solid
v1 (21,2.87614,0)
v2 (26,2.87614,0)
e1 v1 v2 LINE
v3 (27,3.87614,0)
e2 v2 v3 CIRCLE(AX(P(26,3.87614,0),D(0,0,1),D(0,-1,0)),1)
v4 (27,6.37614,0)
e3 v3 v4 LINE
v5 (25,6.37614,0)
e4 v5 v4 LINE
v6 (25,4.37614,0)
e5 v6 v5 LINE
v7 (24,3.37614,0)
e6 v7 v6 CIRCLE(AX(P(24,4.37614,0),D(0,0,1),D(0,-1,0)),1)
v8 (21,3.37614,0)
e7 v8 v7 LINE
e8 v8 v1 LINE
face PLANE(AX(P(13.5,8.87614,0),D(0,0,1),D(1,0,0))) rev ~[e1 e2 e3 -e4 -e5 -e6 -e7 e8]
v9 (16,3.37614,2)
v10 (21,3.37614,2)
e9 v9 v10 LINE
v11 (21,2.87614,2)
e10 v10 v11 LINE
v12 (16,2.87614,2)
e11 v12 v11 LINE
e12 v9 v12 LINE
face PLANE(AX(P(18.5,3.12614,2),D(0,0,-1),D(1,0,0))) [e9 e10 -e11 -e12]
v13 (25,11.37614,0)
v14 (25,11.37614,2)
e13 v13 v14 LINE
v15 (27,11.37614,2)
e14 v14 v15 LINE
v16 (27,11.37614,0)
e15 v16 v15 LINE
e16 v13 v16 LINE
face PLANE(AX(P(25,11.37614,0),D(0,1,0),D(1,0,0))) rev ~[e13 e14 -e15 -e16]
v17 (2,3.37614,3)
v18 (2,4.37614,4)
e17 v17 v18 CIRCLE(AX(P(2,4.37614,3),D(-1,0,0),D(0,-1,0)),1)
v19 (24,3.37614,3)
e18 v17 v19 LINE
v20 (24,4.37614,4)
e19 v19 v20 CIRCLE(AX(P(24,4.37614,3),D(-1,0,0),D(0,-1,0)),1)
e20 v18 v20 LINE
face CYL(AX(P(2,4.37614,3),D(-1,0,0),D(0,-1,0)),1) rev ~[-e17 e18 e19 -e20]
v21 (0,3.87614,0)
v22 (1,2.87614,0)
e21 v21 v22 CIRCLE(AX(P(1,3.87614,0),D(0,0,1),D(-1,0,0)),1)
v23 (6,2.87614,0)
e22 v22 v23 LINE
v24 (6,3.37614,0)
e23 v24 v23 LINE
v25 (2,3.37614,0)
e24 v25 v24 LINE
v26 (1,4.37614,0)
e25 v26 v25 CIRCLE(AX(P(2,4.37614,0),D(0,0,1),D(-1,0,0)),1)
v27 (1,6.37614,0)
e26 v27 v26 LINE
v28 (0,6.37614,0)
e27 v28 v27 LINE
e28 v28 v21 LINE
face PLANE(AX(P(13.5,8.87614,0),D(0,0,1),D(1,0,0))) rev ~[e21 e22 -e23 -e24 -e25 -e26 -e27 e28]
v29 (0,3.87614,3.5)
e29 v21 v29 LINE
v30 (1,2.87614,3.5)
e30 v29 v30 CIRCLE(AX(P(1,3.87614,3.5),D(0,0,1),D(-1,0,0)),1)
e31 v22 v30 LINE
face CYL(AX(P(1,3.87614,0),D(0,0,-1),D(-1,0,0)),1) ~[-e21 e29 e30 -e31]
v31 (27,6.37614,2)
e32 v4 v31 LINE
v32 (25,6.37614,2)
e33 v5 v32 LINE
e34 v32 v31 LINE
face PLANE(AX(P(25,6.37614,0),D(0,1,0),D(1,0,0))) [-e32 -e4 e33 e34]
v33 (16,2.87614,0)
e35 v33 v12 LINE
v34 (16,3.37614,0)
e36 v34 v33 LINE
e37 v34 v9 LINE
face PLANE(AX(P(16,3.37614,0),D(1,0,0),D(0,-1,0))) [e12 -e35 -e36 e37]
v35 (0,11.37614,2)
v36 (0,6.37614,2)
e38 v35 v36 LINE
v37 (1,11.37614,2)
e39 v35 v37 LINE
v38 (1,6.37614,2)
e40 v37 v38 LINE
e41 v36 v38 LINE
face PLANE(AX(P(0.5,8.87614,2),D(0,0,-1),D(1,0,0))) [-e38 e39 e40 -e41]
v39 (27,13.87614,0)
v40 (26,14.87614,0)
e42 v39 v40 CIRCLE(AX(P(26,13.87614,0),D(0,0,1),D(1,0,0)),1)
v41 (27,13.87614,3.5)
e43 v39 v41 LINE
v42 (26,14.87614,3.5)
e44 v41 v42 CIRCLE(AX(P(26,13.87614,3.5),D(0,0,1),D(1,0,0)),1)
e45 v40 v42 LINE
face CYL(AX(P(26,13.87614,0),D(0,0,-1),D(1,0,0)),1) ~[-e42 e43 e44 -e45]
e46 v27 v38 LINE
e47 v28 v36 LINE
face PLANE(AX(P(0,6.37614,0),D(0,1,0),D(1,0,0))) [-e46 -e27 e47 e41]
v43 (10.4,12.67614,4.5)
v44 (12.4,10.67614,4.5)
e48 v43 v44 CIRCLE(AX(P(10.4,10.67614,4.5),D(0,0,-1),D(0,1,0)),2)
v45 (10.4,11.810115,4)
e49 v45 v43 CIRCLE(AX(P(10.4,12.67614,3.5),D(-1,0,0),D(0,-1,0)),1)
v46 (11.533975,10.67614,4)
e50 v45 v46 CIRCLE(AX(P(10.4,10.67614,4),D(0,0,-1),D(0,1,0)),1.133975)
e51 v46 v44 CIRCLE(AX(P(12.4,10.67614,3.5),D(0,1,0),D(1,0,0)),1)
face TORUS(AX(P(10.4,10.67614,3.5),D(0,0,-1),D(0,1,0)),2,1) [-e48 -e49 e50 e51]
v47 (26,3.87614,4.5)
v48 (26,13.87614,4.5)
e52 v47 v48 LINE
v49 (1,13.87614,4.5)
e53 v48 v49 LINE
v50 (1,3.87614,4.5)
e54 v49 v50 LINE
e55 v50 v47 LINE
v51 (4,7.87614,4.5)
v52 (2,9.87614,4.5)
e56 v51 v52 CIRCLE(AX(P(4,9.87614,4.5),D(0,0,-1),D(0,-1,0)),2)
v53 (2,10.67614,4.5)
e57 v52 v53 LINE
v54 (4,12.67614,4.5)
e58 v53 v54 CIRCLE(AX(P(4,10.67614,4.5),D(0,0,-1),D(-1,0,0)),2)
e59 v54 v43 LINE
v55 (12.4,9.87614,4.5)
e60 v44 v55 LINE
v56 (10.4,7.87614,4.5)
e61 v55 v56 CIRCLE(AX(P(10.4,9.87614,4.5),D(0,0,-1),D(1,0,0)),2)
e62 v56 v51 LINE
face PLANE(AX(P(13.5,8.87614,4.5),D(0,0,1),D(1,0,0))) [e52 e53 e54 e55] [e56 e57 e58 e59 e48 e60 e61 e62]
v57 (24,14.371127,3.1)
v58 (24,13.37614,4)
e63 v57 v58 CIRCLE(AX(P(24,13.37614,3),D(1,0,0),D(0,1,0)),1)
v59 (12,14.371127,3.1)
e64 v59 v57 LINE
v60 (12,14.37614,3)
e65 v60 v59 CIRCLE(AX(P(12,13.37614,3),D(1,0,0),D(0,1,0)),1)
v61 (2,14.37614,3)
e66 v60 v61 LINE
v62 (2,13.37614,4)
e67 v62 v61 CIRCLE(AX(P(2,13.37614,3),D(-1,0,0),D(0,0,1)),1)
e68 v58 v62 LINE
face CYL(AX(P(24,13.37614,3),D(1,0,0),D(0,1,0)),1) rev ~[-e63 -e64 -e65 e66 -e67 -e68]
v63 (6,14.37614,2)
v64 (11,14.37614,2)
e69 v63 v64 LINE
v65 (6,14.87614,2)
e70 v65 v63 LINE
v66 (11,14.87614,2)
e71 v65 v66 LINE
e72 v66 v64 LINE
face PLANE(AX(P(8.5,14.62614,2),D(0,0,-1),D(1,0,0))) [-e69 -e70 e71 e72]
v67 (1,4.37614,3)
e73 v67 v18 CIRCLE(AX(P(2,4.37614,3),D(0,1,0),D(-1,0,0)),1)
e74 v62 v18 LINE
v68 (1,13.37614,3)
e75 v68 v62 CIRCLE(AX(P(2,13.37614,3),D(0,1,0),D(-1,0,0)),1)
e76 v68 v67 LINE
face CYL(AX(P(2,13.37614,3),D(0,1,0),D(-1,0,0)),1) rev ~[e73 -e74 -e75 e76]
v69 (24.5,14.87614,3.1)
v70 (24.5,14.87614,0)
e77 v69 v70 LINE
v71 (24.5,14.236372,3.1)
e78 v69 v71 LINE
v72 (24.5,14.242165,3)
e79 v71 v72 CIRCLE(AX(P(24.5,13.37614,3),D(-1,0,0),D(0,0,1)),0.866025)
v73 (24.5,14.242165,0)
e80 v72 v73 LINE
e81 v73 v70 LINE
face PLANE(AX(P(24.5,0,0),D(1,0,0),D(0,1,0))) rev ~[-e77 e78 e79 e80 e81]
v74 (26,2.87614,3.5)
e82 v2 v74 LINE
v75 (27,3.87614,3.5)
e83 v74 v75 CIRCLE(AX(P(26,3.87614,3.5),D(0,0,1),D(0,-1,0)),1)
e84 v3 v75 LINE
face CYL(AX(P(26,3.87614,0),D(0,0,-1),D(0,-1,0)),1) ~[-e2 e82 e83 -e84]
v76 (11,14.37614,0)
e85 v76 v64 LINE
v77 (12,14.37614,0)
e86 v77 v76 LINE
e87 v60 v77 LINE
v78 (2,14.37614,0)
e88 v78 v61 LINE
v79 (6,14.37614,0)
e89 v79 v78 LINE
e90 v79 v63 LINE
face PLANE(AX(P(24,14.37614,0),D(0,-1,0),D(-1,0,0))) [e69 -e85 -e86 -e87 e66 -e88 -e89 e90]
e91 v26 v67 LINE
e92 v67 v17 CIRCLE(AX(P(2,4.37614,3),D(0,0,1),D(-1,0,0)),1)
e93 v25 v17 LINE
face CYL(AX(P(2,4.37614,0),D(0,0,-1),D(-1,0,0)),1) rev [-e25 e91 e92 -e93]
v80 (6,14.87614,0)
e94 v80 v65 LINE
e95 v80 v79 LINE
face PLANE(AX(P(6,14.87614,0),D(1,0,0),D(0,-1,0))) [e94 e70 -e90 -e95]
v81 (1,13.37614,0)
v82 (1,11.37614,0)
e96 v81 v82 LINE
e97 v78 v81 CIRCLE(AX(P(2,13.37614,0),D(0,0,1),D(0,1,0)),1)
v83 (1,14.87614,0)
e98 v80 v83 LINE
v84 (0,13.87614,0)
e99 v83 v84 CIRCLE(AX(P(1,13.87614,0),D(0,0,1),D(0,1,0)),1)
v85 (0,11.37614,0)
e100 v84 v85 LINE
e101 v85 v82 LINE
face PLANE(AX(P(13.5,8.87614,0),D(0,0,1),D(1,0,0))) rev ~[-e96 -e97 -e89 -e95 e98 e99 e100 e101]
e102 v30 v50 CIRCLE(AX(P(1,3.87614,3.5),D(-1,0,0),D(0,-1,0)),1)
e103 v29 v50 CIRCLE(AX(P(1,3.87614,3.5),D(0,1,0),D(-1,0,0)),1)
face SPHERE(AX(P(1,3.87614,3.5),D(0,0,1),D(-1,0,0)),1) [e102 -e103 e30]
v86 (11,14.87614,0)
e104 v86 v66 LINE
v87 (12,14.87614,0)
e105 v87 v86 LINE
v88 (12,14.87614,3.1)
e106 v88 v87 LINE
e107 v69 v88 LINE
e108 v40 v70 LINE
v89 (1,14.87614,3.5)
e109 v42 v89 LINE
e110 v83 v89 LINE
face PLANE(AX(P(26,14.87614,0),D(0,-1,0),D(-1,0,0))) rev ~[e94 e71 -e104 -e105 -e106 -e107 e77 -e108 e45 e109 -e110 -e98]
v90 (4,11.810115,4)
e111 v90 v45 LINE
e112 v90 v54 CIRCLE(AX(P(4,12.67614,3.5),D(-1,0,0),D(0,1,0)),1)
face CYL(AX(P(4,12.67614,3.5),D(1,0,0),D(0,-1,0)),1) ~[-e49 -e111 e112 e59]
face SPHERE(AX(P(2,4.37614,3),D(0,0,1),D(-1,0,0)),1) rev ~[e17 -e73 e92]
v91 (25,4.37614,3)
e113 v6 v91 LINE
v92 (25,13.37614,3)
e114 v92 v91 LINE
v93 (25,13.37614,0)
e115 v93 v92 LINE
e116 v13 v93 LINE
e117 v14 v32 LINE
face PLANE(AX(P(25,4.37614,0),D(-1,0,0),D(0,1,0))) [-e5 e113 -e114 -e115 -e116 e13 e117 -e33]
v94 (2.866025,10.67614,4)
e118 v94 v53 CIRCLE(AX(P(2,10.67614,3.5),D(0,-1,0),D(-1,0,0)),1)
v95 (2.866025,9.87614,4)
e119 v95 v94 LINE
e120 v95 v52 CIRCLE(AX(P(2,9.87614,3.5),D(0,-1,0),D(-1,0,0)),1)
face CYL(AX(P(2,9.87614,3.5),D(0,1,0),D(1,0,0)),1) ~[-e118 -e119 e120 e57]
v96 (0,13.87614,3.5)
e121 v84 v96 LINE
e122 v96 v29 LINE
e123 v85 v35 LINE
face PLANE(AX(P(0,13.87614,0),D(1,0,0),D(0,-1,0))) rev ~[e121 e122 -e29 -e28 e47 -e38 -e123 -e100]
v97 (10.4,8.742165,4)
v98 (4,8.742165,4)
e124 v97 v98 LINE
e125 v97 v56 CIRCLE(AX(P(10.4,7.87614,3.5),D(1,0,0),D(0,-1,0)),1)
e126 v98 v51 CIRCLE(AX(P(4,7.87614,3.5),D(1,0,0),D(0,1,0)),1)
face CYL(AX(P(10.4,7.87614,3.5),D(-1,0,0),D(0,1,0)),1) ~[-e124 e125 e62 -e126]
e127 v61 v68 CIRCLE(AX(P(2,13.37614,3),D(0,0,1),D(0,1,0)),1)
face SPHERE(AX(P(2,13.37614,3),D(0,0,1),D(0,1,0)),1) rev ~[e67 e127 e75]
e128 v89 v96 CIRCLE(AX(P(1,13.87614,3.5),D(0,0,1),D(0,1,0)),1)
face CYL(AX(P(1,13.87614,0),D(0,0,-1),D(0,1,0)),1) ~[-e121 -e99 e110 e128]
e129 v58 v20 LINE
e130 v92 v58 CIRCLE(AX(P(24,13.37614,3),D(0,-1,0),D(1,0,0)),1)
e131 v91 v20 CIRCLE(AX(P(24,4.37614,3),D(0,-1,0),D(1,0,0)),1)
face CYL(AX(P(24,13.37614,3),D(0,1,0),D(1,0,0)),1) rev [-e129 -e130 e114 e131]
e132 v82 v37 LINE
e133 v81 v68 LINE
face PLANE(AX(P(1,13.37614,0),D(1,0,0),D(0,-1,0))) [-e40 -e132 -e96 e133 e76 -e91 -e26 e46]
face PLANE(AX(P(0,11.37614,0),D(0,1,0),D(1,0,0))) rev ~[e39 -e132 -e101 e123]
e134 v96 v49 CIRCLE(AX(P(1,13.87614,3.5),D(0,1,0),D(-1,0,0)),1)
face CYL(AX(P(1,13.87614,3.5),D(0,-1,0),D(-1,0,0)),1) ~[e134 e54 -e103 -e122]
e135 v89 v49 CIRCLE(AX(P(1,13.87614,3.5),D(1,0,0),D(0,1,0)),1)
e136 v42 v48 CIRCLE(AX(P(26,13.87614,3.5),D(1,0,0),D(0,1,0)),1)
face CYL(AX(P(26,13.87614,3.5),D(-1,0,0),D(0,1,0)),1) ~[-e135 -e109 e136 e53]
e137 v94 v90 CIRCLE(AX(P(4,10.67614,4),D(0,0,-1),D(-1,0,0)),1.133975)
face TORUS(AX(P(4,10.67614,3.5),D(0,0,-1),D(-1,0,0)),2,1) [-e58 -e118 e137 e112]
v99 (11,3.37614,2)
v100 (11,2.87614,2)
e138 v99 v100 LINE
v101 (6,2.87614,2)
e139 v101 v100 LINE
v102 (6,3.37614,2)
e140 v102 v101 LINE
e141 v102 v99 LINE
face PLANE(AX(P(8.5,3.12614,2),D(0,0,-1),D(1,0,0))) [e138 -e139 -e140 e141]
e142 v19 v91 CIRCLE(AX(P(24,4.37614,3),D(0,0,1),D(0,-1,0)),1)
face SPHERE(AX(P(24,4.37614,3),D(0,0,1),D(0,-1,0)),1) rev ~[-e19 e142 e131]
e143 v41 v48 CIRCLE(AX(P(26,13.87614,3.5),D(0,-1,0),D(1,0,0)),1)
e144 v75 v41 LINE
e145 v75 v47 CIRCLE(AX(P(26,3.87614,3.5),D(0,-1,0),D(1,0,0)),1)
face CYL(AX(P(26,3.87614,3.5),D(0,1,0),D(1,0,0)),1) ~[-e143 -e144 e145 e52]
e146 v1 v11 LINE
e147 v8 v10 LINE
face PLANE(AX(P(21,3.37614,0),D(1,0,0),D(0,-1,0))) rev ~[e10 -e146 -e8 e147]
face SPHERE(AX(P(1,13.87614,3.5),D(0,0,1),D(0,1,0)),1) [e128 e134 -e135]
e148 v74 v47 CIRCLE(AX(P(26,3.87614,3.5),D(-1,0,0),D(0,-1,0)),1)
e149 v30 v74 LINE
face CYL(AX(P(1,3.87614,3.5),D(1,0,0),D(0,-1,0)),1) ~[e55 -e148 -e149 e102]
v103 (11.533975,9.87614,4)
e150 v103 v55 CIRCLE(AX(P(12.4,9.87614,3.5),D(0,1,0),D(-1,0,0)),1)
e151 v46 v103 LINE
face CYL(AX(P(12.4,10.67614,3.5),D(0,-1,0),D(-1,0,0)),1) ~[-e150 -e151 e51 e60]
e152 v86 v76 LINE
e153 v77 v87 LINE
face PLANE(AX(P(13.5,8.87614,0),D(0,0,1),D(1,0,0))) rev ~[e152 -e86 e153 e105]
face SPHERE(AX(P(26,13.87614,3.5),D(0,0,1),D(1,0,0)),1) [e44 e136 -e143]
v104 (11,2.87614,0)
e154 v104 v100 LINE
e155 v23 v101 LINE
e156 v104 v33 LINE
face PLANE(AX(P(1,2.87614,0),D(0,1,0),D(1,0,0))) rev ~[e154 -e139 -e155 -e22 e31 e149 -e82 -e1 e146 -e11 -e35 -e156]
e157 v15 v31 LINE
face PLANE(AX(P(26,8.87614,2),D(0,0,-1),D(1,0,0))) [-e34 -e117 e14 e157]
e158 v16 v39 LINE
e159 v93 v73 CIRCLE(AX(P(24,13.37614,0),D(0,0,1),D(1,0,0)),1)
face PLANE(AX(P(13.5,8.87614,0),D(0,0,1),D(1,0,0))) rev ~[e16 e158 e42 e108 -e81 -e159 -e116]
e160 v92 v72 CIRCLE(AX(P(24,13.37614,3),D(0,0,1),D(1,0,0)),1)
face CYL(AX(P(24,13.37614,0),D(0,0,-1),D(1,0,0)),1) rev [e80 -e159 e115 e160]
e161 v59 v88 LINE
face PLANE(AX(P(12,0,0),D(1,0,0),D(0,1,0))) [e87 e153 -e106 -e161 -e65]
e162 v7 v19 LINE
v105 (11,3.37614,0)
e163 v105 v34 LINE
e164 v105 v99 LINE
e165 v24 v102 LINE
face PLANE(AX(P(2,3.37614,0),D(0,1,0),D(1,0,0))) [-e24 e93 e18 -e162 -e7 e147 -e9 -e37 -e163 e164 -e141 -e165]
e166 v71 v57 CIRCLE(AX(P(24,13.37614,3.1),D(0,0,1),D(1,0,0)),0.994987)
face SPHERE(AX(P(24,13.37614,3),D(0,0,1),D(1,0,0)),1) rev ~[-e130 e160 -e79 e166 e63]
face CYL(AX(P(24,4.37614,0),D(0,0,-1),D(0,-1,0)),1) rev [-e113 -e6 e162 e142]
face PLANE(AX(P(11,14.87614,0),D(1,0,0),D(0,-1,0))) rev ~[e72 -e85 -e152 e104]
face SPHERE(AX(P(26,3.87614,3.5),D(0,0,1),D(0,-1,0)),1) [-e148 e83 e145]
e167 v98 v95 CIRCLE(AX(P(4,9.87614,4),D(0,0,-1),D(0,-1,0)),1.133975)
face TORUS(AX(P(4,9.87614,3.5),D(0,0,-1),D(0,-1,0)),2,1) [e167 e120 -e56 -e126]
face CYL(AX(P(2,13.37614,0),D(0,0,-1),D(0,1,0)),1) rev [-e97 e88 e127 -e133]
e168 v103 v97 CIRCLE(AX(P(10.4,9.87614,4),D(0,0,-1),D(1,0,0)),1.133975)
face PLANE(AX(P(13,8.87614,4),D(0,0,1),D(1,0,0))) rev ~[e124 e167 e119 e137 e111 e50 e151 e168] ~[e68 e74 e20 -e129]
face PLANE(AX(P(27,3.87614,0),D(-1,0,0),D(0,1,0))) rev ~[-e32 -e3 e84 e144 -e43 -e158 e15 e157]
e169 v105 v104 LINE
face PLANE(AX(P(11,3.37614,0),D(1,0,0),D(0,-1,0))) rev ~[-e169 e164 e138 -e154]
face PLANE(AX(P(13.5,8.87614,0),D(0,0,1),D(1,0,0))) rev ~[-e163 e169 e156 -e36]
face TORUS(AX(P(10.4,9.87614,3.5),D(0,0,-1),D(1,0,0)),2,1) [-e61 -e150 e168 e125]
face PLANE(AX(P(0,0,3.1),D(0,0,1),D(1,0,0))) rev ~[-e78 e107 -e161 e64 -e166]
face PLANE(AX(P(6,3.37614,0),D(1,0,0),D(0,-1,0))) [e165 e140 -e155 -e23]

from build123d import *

# Parameters (mm, degrees)
F1_DEPTH     = 4.5
F2_R         = 1
F4_DEPTH     = 4
F5_W         = 12.5
F5_H         = 2.9783394848
F6_DEPTH     = 3.1
F7_T1_DEPTH  = 22
F7_T3_DEPTH  = 9
F7_T6_ANGLE  = 90
F7_T10_DEPTH = 22
F7_T16_DEPTH = 22
F7_T22_DEPTH = 22
F7_T26_ANGLE = 90
F7_T30_ANGLE = 90
F7_T36_ANGLE = 90
F7_T42_ANGLE = 90
F7_T46_ANGLE = 90
F8_W         = 1
F8_H         = 5
F8_W_2       = 2
F8_W_3       = 5
F8_H_2       = 0.5
F9_DEPTH     = 2


# Not quite as in the source:
# - a fillet or chamfer that OpenCascade refuses, or shapes differently, is made with other operations: its cross-section is extruded or revolved along the edge and cut away or added


with BuildPart() as f1:
    # F0 (on Top) → F1 (new body)
    with BuildSketch(Plane.XY):
        with BuildLine():
            ThreePointArc((0, 3.8761399509), (0.2928932188, 3.1690331698), (1, 2.8761399509))
            Line((1, 2.8761399509), (26, 2.8761399509))
            ThreePointArc((26, 2.8761399509), (26.7071067812, 3.1690331698), (27, 3.8761399509))
            Line((27, 3.8761399509), (27, 13.8761399509))
            ThreePointArc((27, 13.8761399509), (26.7071067812, 14.5832467321), (26, 14.8761399509))
            Line((26, 14.8761399509), (1, 14.8761399509))
            ThreePointArc((1, 14.8761399509), (0.2928932188, 14.5832467321), (0, 13.8761399509))
            Line((0, 13.8761399509), (0, 3.8761399509))
        make_face()
        with BuildLine():
            ThreePointArc((3, 10.6761399509), (3.2928932188, 11.3832467321), (4, 11.6761399509))
            Line((4, 11.6761399509), (10.4, 11.6761399509))
            ThreePointArc((10.4, 11.6761399509), (11.1071067812, 11.3832467321), (11.4, 10.6761399509))
            Line((11.4, 10.6761399509), (11.4, 9.8761399509))
            ThreePointArc((11.4, 9.8761399509), (11.1071067812, 9.1690331698), (10.4, 8.8761399509))
            Line((10.4, 8.8761399509), (4, 8.8761399509))
            ThreePointArc((4, 8.8761399509), (3.2928932188, 9.1690331698), (3, 9.8761399509))
            Line((3, 9.8761399509), (3, 10.6761399509))
        make_face(mode=Mode.SUBTRACT)
    extrude(amount=F1_DEPTH)

    # F2
    f2_edges = [f1.edges().sort_by_distance(p)[0] for p in [
        (0.292893, 3.169033, 4.5),
        (13.5, 2.87614, 4.5),
        (26.707107, 3.169033, 4.5),
        (27, 8.87614, 4.5),
        (26.707107, 14.583247, 4.5),
        (13.5, 14.87614, 4.5),
        (0.292893, 14.583247, 4.5),
        (0, 8.87614, 4.5),
        (3.292893, 11.383247, 4.5),
        (7.2, 11.67614, 4.5),
        (11.107107, 11.383247, 4.5),
        (11.4, 10.27614, 4.5),
        (11.107107, 9.169033, 4.5),
        (7.2, 8.87614, 4.5),
        (3.292893, 9.169033, 4.5),
        (3, 10.27614, 4.5),
    ]]
    fillet(f2_edges, radius=F2_R)

    # F3 (on Top) → F4 (cut)
    with BuildSketch(Plane.XY):
        with BuildLine():
            ThreePointArc((25, 13.3761399509), (24.7071067812, 14.0832467321), (24, 14.3761399509))
            Line((24, 14.3761399509), (2, 14.3761399509))
            ThreePointArc((2, 14.3761399509), (1.2928932188, 14.0832467321), (1, 13.3761399509))
            Line((1, 13.3761399509), (1, 4.3761399509))
            ThreePointArc((1, 4.3761399509), (1.2928932188, 3.6690331698), (2, 3.3761399509))
            Line((2, 3.3761399509), (14.5, 3.3761399509))
            Line((14.5, 3.3761399509), (24, 3.3761399509))
            ThreePointArc((24, 3.3761399509), (24.7071067812, 3.6690331698), (25, 4.3761399509))
            Line((25, 4.3761399509), (25, 13.3761399509))
        make_face()
    extrude(amount=F4_DEPTH, mode=Mode.SUBTRACT)

    # F5 (on Top) → F6 (cut)
    with BuildSketch(Plane.XY):
        with Locations((18.25, 14.7778680548)):
            Rectangle(F5_W, F5_H)
    extrude(amount=F6_DEPTH, mode=Mode.SUBTRACT)

    # F7: fillet of radius 1 on 8 edges, made by hand

    # F7_s2 → F7_t1 (join)
    with BuildSketch(Plane.YZ.offset(2)):
        with BuildLine():
            ThreePointArc((3.3761399509, 3), (3.6690331698, 3.7071067812), (4.3761399509, 4))
            Line((4.3761399509, 4), (3.3761399509, 4))
            Line((3.3761399509, 4), (3.3761399509, 3))
        make_face()
    extrude(amount=F7_T1_DEPTH)

    # F7_s4 → F7_t3 (join)
    with BuildSketch(Plane.XZ.offset(-13.3761399509)):
        with BuildLine():
            ThreePointArc((25, 3), (24.7071067812, 3.7071067812), (24, 4))
            Line((24, 4), (25, 4))
            Line((25, 4), (25, 3))
        make_face()
        with BuildLine():
            ThreePointArc((1, 3), (1.2928932188, 3.7071067812), (2, 4))
            Line((2, 4), (1, 4))
            Line((1, 4), (1, 3))
        make_face()
    extrude(amount=F7_T3_DEPTH)

    # F7_s5 → F7_t6 (revolve)
    with BuildSketch(Plane.XZ.offset(-4.3761399509)):
        with BuildLine():
            ThreePointArc((1, 3), (1.2928932188, 3.7071067812), (2, 4))
            Line((2, 4), (1, 4))
            Line((1, 4), (1, 3))
        make_face()
    revolve(axis=Axis((2, 4.3761399509, 4), (0, 0, 1)), revolution_arc=F7_T6_ANGLE)


with BuildPart() as f7_tool8:
    # F7_s9 → F7_t10 (new body)
    with BuildSketch(Plane.YZ.offset(24)):
        with BuildLine():
            ThreePointArc((14.3761399509, 3), (14.0832467321, 3.7071067812), (13.3761399509, 4))
            Line((13.3761399509, 4), (14.3761399509, 4))
            Line((14.3761399509, 4), (14.3761399509, 3))
        make_face()
    extrude(amount=-F7_T10_DEPTH)

    split(bisect_by=Plane.YZ.offset(12), keep=Keep.TOP)

    split(bisect_by=Plane.XY.offset(3.1), keep=Keep.TOP)


with BuildPart() as f1_1:
    add(f1.part)

    # F7_t7: union F7_tool8
    add(f7_tool8.part)


with BuildPart() as f7_tool14:
    # F7_s15 → F7_t16 (new body)
    with BuildSketch(Plane.YZ.offset(24)):
        with BuildLine():
            ThreePointArc((14.3761399509, 3), (14.0832467321, 3.7071067812), (13.3761399509, 4))
            Line((13.3761399509, 4), (14.3761399509, 4))
            Line((14.3761399509, 4), (14.3761399509, 3))
        make_face()
    extrude(amount=-F7_T16_DEPTH)

    split(bisect_by=Plane.YZ.offset(12), keep=Keep.BOTTOM)

    split(bisect_by=Plane.XY.offset(3.1), keep=Keep.BOTTOM)


with BuildPart() as f1_2:
    add(f1_1.part)

    # F7_t13: union F7_tool14
    add(f7_tool14.part)


with BuildPart() as f7_tool20:
    # F7_s21 → F7_t22 (new body)
    with BuildSketch(Plane.YZ.offset(24)):
        with BuildLine():
            ThreePointArc((14.3761399509, 3), (14.0832467321, 3.7071067812), (13.3761399509, 4))
            Line((13.3761399509, 4), (14.3761399509, 4))
            Line((14.3761399509, 4), (14.3761399509, 3))
        make_face()
    extrude(amount=-F7_T22_DEPTH)

    split(bisect_by=Plane.YZ.offset(12), keep=Keep.BOTTOM)

    split(bisect_by=Plane.XY.offset(3.1), keep=Keep.TOP)


with BuildPart() as f1_3:
    add(f1_2.part)

    # F7_t19: union F7_tool20
    add(f7_tool20.part)

    # F7_s25 → F7_t26 (revolve)
    with BuildSketch(Plane.YZ.offset(2)):
        with BuildLine():
            ThreePointArc((14.3761399509, 3), (14.0832467321, 3.7071067812), (13.3761399509, 4))
            Line((13.3761399509, 4), (14.3761399509, 4))
            Line((14.3761399509, 4), (14.3761399509, 3))
        make_face()
    revolve(axis=Axis((2, 13.3761399509, 4), (0, 0, 1)), revolution_arc=F7_T26_ANGLE)


with BuildPart() as f7_tool28:
    # F7_s29 → F7_t30 (revolve)
    with BuildSketch(Plane.XZ.offset(-13.3761399509)):
        with BuildLine():
            ThreePointArc((25, 3), (24.7071067812, 3.7071067812), (24, 4))
            Line((24, 4), (25, 4))
            Line((25, 4), (25, 3))
        make_face()
    revolve(axis=Axis((24, 13.3761399509, 4), (0, 0, 1)), revolution_arc=F7_T30_ANGLE)

    split(bisect_by=Plane.YZ.offset(24.5), keep=Keep.TOP)

    split(bisect_by=Plane.XY.offset(3.1), keep=Keep.BOTTOM)


with BuildPart() as f1_4:
    add(f1_3.part)

    # F7_t27: union F7_tool28
    add(f7_tool28.part)


with BuildPart() as f7_tool34:
    # F7_s35 → F7_t36 (revolve)
    with BuildSketch(Plane.XZ.offset(-13.3761399509)):
        with BuildLine():
            ThreePointArc((25, 3), (24.7071067812, 3.7071067812), (24, 4))
            Line((24, 4), (25, 4))
            Line((25, 4), (25, 3))
        make_face()
    revolve(axis=Axis((24, 13.3761399509, 4), (0, 0, 1)), revolution_arc=F7_T36_ANGLE)

    split(bisect_by=Plane.YZ.offset(24.5), keep=Keep.TOP)

    split(bisect_by=Plane.XY.offset(3.1), keep=Keep.TOP)


with BuildPart() as f1_5:
    add(f1_4.part)

    # F7_t33: union F7_tool34
    add(f7_tool34.part)


with BuildPart() as f7_tool40:
    # F7_s41 → F7_t42 (revolve)
    with BuildSketch(Plane.XZ.offset(-13.3761399509)):
        with BuildLine():
            ThreePointArc((25, 3), (24.7071067812, 3.7071067812), (24, 4))
            Line((24, 4), (25, 4))
            Line((25, 4), (25, 3))
        make_face()
    revolve(axis=Axis((24, 13.3761399509, 4), (0, 0, 1)), revolution_arc=F7_T42_ANGLE)

    split(bisect_by=Plane.YZ.offset(24.5), keep=Keep.BOTTOM)

    split(bisect_by=Plane.XY.offset(3.1), keep=Keep.TOP)


with BuildPart() as f1_6:
    add(f1_5.part)

    # F7_t39: union F7_tool40
    add(f7_tool40.part)

    # F7_s45 → F7_t46 (revolve)
    with BuildSketch(Plane.YZ.offset(24)):
        with BuildLine():
            ThreePointArc((3.3761399509, 3), (3.6690331698, 3.7071067812), (4.3761399509, 4))
            Line((4.3761399509, 4), (3.3761399509, 4))
            Line((3.3761399509, 4), (3.3761399509, 3))
        make_face()
    revolve(axis=Axis((24, 4.3761399509, 4), (0, 0, 1)), revolution_arc=F7_T46_ANGLE)

    # F8 (on face) → F9 (cut)
    with BuildSketch(Plane(origin=(0, 0, 0), x_dir=(1, 0, 0), z_dir=(0, 0, -1))):
        with Locations((0.5, -8.8761399509)):
            Rectangle(F8_W, F8_H)
        with Locations((26, -8.8761399509)):
            Rectangle(F8_W_2, F8_H)
        with Locations((8.5, -3.1261399509)):
            Rectangle(F8_W_3, F8_H_2)
        with Locations((18.5, -3.1261399509)):
            Rectangle(F8_W_3, F8_H_2)
        with Locations((8.5, -14.6261399509)):
            Rectangle(F8_W_3, F8_H_2)
    extrude(amount=-F9_DEPTH, mode=Mode.SUBTRACT)


solid = f1_6.part
